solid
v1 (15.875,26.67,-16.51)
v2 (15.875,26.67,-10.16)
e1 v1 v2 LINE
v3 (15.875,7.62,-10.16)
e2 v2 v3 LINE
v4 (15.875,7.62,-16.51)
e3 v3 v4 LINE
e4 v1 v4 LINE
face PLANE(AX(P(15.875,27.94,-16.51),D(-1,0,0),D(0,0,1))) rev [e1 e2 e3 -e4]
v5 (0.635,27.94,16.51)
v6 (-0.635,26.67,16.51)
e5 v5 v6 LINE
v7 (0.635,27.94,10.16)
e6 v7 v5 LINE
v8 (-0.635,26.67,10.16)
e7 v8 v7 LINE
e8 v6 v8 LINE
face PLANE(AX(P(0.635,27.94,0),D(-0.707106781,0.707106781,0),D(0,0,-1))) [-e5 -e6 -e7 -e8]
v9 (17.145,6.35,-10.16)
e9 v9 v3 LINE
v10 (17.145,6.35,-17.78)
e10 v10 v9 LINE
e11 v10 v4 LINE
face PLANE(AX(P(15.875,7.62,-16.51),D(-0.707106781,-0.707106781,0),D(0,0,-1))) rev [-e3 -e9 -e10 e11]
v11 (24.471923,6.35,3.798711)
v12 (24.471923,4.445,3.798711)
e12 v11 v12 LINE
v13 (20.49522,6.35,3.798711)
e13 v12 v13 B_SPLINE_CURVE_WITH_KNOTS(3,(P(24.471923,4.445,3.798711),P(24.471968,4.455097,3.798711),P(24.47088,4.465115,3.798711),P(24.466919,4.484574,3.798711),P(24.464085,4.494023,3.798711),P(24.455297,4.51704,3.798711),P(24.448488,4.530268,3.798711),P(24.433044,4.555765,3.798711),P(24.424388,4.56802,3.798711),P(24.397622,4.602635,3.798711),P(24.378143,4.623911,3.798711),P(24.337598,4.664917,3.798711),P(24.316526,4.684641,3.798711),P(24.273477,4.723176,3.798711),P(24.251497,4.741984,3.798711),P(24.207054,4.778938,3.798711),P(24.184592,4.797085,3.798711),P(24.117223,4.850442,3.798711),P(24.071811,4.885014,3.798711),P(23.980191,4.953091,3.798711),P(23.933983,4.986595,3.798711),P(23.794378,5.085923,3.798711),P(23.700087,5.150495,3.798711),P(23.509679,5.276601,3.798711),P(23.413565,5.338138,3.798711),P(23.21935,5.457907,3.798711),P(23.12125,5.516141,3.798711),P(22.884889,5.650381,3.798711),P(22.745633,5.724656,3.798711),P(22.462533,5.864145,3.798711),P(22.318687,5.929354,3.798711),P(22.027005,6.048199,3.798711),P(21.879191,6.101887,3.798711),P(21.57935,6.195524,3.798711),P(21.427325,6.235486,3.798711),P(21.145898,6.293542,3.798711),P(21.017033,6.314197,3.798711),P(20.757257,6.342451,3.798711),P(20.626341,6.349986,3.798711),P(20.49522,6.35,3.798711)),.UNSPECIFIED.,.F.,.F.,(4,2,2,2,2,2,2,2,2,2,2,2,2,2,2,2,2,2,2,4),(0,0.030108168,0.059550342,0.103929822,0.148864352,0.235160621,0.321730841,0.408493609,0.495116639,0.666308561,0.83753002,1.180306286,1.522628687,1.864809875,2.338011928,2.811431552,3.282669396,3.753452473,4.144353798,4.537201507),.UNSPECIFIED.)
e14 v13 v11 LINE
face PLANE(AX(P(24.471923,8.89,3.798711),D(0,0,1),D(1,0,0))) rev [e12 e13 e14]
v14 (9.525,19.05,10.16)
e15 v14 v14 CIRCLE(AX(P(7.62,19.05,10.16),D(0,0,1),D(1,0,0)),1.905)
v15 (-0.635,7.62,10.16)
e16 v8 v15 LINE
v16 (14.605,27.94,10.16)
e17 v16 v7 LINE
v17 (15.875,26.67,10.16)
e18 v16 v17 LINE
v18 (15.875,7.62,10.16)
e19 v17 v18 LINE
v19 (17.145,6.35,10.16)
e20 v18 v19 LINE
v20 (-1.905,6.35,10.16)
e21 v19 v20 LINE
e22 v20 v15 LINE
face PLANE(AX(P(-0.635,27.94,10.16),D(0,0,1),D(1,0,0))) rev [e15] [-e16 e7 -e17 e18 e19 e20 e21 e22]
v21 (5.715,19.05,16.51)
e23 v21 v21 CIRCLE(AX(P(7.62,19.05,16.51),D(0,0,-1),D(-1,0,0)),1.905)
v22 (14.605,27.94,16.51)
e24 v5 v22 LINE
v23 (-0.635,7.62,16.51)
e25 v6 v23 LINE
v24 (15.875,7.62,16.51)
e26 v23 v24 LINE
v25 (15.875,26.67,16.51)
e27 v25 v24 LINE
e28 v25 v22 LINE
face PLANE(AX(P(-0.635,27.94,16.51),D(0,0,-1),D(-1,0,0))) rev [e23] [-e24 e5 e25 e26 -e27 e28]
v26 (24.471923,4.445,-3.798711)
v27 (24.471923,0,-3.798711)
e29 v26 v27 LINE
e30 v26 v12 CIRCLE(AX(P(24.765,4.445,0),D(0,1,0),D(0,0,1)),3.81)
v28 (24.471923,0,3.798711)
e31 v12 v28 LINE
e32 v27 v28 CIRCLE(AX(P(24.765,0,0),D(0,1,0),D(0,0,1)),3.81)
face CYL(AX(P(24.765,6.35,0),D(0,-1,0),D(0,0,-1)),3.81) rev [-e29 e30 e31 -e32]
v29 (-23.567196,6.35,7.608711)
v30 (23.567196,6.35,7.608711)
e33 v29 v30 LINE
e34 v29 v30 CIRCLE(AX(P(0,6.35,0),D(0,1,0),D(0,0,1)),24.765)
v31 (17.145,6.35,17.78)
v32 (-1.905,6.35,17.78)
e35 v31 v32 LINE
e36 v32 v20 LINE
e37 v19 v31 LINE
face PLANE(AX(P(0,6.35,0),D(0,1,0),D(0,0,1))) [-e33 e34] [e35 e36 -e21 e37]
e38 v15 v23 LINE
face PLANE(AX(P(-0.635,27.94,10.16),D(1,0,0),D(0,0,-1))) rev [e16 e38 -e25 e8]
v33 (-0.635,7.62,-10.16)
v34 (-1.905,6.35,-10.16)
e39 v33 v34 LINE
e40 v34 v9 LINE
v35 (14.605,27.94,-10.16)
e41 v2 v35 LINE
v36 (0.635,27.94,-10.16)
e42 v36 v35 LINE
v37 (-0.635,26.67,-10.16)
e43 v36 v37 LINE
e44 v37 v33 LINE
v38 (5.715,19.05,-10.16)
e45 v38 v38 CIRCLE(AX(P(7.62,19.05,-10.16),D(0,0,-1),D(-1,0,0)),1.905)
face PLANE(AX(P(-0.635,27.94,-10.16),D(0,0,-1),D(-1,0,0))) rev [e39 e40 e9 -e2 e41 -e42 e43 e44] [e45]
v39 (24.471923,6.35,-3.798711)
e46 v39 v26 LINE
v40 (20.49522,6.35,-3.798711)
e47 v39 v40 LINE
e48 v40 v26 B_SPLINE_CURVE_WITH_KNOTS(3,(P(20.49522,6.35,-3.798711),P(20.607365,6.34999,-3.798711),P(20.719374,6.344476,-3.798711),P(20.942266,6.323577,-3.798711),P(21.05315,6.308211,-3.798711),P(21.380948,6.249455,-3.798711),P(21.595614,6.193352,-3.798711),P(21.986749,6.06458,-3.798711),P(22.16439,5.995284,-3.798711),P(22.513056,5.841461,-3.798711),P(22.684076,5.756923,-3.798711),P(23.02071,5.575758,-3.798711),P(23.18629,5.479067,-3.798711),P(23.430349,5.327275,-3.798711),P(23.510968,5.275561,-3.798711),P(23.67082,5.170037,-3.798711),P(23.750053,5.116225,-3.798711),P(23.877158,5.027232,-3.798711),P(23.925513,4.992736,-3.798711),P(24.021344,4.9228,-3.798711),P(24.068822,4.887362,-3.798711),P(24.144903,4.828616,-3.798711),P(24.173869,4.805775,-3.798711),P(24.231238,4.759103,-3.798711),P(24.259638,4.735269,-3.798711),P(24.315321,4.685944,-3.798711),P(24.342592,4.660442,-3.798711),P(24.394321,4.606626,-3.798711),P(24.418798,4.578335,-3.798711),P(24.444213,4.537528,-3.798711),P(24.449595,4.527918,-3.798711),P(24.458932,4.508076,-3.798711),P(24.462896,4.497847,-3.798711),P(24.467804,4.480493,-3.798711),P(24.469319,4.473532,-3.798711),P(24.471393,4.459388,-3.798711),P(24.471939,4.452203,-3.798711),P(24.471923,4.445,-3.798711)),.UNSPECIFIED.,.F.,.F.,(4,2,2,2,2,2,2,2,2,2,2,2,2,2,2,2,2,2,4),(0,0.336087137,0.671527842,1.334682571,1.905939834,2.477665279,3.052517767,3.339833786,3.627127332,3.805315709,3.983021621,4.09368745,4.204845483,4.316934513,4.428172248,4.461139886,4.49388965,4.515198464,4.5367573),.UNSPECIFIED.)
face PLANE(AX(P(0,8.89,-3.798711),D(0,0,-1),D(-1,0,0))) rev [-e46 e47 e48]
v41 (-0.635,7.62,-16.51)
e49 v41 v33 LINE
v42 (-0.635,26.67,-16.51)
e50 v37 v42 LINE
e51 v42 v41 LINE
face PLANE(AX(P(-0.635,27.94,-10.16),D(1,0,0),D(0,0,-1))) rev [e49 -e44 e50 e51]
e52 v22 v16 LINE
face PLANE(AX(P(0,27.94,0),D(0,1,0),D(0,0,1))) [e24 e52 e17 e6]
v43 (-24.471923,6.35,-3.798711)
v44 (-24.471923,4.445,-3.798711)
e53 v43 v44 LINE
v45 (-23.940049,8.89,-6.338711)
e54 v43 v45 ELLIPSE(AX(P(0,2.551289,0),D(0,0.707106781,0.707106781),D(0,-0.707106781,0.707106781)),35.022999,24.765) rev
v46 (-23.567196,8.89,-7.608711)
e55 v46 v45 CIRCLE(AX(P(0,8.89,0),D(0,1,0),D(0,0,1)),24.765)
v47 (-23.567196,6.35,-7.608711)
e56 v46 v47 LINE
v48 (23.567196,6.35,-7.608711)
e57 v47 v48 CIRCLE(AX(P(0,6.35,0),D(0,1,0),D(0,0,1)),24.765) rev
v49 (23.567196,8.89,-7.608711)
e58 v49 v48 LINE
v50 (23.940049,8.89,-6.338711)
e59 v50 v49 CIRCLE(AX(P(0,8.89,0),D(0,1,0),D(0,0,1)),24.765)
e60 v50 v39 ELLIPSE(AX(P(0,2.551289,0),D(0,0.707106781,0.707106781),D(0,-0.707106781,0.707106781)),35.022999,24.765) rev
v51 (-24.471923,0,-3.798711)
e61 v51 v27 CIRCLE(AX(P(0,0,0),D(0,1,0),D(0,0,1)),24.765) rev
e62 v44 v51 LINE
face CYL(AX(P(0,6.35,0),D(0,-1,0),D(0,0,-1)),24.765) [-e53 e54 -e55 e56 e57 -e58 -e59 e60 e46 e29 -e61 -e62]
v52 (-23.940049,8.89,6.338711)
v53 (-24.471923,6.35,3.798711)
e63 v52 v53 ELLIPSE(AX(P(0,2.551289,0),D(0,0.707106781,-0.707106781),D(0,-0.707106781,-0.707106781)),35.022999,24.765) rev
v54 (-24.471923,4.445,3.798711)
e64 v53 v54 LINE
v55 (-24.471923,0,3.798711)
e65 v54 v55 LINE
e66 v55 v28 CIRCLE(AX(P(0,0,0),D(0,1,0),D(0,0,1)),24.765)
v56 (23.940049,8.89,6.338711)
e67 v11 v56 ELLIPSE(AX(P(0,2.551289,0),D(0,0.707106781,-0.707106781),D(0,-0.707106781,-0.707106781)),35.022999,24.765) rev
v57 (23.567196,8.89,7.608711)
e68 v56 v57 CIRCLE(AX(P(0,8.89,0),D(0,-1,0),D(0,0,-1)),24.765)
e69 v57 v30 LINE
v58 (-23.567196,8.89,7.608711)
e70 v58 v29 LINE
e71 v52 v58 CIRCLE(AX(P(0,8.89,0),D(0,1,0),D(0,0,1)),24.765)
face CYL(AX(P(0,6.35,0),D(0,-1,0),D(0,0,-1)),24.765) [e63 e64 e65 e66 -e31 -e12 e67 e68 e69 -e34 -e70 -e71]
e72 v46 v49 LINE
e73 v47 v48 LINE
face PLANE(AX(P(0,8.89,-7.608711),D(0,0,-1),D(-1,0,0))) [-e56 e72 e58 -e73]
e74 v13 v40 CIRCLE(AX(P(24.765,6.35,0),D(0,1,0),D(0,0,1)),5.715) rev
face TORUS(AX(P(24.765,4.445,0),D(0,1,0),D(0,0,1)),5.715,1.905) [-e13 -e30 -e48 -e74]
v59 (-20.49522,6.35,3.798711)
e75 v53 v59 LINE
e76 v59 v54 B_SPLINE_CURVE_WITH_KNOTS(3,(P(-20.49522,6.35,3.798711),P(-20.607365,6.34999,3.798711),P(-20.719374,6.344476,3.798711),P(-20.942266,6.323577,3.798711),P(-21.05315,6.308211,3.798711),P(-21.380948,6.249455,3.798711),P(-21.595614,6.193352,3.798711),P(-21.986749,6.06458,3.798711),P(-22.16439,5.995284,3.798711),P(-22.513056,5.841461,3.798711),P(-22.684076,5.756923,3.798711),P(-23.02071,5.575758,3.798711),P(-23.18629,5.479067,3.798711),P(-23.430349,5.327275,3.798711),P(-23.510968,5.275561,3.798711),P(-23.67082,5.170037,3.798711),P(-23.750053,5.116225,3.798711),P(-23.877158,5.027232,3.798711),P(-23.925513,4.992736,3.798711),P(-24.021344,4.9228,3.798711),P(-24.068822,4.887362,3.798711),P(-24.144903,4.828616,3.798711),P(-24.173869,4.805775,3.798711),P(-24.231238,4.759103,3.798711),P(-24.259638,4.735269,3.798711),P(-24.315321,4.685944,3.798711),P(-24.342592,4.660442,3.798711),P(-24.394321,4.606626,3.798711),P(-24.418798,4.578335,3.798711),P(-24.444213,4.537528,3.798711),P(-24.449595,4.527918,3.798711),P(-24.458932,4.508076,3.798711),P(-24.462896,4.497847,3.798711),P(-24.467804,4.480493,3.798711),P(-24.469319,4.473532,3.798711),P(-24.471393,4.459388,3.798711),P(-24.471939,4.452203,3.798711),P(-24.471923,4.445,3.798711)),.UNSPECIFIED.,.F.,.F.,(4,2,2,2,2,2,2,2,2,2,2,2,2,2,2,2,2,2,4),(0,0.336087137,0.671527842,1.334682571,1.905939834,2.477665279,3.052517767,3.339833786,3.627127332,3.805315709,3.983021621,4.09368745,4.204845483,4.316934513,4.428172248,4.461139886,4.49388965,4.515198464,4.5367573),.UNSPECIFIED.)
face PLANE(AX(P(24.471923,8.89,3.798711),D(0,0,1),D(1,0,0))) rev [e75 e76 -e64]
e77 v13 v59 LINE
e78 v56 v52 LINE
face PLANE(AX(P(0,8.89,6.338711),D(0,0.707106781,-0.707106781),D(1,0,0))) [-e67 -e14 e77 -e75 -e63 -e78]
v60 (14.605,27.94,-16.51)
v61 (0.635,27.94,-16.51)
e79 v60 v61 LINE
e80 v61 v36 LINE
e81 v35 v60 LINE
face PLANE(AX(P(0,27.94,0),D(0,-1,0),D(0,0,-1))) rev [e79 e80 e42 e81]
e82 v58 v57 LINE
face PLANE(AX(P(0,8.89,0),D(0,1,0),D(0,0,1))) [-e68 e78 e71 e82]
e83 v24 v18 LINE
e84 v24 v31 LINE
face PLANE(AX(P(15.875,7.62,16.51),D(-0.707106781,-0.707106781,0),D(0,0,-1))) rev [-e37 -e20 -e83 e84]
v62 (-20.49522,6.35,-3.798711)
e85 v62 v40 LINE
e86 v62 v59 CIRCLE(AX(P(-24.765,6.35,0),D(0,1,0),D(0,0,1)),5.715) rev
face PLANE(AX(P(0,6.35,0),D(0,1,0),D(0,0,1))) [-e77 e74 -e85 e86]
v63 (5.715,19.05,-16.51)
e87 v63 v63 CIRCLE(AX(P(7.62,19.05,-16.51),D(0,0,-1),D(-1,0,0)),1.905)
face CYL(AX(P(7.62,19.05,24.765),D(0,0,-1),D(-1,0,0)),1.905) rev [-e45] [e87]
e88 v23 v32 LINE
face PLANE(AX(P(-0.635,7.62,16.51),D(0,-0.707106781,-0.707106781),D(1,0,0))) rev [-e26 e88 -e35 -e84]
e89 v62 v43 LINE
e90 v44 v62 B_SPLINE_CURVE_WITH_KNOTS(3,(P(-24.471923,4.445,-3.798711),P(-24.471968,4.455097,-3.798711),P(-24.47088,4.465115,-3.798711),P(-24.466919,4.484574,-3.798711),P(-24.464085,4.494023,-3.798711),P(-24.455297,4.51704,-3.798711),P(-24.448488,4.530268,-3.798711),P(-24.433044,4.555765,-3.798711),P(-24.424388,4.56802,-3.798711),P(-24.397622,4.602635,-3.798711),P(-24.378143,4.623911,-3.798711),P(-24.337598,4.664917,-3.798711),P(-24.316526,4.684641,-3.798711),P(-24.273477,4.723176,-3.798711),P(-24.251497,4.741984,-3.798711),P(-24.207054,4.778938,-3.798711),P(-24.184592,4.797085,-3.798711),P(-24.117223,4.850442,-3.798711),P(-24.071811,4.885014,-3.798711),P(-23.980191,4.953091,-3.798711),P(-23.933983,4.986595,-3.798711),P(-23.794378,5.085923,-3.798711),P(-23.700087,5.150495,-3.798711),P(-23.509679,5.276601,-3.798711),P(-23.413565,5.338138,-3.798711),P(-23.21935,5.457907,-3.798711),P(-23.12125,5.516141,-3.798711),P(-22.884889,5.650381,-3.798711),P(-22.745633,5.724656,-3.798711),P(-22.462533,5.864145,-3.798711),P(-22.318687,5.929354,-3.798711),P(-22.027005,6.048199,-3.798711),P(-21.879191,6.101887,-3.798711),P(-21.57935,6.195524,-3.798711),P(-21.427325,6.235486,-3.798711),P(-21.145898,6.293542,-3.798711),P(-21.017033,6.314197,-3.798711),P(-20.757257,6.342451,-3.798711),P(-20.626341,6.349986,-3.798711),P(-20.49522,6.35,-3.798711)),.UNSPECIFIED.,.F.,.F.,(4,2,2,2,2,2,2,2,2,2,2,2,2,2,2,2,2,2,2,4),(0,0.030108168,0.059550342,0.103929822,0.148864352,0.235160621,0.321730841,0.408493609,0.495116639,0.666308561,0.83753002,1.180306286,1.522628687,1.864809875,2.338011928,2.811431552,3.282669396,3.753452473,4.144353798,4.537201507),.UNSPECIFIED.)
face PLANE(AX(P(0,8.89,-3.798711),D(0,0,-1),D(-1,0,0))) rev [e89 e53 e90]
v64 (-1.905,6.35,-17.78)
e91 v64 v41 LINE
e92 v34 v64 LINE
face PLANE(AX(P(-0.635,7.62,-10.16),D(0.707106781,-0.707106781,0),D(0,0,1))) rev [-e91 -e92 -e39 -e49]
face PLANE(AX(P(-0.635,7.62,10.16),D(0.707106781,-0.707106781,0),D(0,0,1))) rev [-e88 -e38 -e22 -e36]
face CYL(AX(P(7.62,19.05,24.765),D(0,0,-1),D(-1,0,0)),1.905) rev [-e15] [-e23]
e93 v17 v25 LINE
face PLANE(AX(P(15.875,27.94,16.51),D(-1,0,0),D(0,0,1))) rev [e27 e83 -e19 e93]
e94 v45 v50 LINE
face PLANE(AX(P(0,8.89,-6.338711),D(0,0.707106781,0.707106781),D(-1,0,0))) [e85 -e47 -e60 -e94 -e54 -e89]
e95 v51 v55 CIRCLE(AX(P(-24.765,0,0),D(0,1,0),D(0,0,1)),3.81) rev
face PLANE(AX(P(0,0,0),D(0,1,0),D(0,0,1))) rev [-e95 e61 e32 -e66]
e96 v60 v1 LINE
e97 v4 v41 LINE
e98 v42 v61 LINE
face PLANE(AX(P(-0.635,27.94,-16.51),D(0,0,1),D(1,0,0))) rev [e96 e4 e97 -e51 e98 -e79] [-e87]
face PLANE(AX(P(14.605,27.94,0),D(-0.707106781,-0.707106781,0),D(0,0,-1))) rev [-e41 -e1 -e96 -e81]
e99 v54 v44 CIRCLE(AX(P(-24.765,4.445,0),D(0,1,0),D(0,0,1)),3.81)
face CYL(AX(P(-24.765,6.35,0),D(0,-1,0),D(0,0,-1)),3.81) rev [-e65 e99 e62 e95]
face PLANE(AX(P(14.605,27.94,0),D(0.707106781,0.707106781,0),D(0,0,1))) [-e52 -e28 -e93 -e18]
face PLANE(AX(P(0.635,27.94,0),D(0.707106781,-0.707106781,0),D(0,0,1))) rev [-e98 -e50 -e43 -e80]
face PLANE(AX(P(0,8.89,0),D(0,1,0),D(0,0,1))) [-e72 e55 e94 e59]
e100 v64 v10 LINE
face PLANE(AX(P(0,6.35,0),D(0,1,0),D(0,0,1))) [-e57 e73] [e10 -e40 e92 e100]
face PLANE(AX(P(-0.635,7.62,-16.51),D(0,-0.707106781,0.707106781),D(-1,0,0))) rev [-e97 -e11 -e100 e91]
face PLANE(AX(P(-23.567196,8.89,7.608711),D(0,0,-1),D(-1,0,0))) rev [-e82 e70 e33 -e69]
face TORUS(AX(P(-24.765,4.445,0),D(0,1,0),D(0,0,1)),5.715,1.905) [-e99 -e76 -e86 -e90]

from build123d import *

# Parameters (mm, degrees)
PLATE_DEPTH         = 6.35
SKETCH2_W           = 16.51
SKETCH2_H           = 6.35
HOOK_UPRIGHTS_DEPTH = 21.59
SKETCH3_R           = 1.905
HOOK_BOLTHOLE_DEPTH = 56.526068149
BAND_GROOVE_DEPTH   = 2.54
FILLET4_R           = 1.905
CHAMFER1_SIZE       = 1.27
CHAMFER2_SIZE       = 2.54


with BuildPart() as part:
    # Sketch1 → plate (new body)
    with BuildSketch(Plane(origin=(0, 0, 0), x_dir=(1, 0, 0), z_dir=(0, 1, 0))):
        with BuildLine():
            ThreePointArc((-24.471923077, 3.798711086), (-20.955, 0), (-24.471923077, -3.798711086))
            ThreePointArc((-24.471923077, -3.798711086), (0, -24.765), (24.471923077, -3.798711086))
            ThreePointArc((24.471923077, -3.798711086), (20.955, 0), (24.471923077, 3.798711086))
            ThreePointArc((24.471923077, 3.798711086), (0, 24.765), (-24.471923077, 3.798711086))
        make_face()
    extrude(amount=PLATE_DEPTH)

    # Sketch2 → hook_uprights (add)
    with BuildSketch(Plane(origin=(0, 6.35, 0), x_dir=(1, 0, 0), z_dir=(0, 1, 0))):
        with Locations((7.62, 13.335)):
            Rectangle(SKETCH2_W, SKETCH2_H)
        with Locations((7.62, -13.335)):
            Rectangle(SKETCH2_W, SKETCH2_H)
    extrude(amount=HOOK_UPRIGHTS_DEPTH)

    # Sketch3 → hook_bolthole (cut, through all)
    with BuildSketch(Plane(origin=(0, 0, -16.51), x_dir=(-1, 0, 0), z_dir=(0, 0, -1))):
        with Locations((-7.62, 19.05)):
            Circle(SKETCH3_R)
    extrude(amount=-HOOK_BOLTHOLE_DEPTH, mode=Mode.SUBTRACT)

    # Sketch4 → band_groove (add)
    with BuildSketch(Plane(origin=(0, 6.35, 0), x_dir=(1, 0, 0), z_dir=(0, 1, 0))):
        with BuildLine():
            ThreePointArc((-23.567196282, 7.608711086), (-24.094984379, 5.721621518), (-24.471923077, 3.798711086))
            Line((-24.471923077, 3.798711086), (24.471923077, 3.798711086))
            ThreePointArc((24.471923077, 3.798711086), (24.094984379, 5.721621518), (23.567196282, 7.608711086))
            Line((23.567196282, 7.608711086), (-23.567196282, 7.608711086))
        make_face()
        with BuildLine():
            Line((-23.567196282, -7.608711086), (23.567196282, -7.608711086))
            ThreePointArc((23.567196282, -7.608711086), (24.094984379, -5.721621518), (24.471923077, -3.798711086))
            Line((24.471923077, -3.798711086), (-24.471923077, -3.798711086))
            ThreePointArc((-24.471923077, -3.798711086), (-24.094984379, -5.721621518), (-23.567196282, -7.608711086))
        make_face()
    extrude(amount=BAND_GROOVE_DEPTH)

    # Fillet4
    fillet4_edges = [part.edges().sort_by_distance(p)[0] for p in [
        (20.955, 6.35, 0),
        (-20.955, 6.35, 0),
    ]]
    fillet(fillet4_edges, radius=FILLET4_R)

    # Chamfer1
    chamfer1_edges = [part.edges().sort_by_distance(p)[0] for p in [
        (-0.635, 6.35, 13.335),
        (7.62, 6.35, 16.51),
        (15.875, 6.35, 13.335),
        (-0.635, 27.94, 13.335),
        (15.875, 27.94, 13.335),
        (-0.635, 6.35, -13.335),
        (15.875, 6.35, -13.335),
        (7.62, 6.35, -16.51),
        (-0.635, 27.94, -13.335),
        (15.875, 27.94, -13.335),
    ]]
    chamfer(chamfer1_edges, length=CHAMFER1_SIZE)

    # Chamfer2
    chamfer2_edges = [part.edges().sort_by_distance(p)[0] for p in [
        (0, 8.89, -3.798711086),
        (0, 8.89, 3.798711086),
    ]]
    chamfer(chamfer2_edges, length=CHAMFER2_SIZE - 0.0001)  # a hair under: the kernel refuses the full size


solid = part.part
